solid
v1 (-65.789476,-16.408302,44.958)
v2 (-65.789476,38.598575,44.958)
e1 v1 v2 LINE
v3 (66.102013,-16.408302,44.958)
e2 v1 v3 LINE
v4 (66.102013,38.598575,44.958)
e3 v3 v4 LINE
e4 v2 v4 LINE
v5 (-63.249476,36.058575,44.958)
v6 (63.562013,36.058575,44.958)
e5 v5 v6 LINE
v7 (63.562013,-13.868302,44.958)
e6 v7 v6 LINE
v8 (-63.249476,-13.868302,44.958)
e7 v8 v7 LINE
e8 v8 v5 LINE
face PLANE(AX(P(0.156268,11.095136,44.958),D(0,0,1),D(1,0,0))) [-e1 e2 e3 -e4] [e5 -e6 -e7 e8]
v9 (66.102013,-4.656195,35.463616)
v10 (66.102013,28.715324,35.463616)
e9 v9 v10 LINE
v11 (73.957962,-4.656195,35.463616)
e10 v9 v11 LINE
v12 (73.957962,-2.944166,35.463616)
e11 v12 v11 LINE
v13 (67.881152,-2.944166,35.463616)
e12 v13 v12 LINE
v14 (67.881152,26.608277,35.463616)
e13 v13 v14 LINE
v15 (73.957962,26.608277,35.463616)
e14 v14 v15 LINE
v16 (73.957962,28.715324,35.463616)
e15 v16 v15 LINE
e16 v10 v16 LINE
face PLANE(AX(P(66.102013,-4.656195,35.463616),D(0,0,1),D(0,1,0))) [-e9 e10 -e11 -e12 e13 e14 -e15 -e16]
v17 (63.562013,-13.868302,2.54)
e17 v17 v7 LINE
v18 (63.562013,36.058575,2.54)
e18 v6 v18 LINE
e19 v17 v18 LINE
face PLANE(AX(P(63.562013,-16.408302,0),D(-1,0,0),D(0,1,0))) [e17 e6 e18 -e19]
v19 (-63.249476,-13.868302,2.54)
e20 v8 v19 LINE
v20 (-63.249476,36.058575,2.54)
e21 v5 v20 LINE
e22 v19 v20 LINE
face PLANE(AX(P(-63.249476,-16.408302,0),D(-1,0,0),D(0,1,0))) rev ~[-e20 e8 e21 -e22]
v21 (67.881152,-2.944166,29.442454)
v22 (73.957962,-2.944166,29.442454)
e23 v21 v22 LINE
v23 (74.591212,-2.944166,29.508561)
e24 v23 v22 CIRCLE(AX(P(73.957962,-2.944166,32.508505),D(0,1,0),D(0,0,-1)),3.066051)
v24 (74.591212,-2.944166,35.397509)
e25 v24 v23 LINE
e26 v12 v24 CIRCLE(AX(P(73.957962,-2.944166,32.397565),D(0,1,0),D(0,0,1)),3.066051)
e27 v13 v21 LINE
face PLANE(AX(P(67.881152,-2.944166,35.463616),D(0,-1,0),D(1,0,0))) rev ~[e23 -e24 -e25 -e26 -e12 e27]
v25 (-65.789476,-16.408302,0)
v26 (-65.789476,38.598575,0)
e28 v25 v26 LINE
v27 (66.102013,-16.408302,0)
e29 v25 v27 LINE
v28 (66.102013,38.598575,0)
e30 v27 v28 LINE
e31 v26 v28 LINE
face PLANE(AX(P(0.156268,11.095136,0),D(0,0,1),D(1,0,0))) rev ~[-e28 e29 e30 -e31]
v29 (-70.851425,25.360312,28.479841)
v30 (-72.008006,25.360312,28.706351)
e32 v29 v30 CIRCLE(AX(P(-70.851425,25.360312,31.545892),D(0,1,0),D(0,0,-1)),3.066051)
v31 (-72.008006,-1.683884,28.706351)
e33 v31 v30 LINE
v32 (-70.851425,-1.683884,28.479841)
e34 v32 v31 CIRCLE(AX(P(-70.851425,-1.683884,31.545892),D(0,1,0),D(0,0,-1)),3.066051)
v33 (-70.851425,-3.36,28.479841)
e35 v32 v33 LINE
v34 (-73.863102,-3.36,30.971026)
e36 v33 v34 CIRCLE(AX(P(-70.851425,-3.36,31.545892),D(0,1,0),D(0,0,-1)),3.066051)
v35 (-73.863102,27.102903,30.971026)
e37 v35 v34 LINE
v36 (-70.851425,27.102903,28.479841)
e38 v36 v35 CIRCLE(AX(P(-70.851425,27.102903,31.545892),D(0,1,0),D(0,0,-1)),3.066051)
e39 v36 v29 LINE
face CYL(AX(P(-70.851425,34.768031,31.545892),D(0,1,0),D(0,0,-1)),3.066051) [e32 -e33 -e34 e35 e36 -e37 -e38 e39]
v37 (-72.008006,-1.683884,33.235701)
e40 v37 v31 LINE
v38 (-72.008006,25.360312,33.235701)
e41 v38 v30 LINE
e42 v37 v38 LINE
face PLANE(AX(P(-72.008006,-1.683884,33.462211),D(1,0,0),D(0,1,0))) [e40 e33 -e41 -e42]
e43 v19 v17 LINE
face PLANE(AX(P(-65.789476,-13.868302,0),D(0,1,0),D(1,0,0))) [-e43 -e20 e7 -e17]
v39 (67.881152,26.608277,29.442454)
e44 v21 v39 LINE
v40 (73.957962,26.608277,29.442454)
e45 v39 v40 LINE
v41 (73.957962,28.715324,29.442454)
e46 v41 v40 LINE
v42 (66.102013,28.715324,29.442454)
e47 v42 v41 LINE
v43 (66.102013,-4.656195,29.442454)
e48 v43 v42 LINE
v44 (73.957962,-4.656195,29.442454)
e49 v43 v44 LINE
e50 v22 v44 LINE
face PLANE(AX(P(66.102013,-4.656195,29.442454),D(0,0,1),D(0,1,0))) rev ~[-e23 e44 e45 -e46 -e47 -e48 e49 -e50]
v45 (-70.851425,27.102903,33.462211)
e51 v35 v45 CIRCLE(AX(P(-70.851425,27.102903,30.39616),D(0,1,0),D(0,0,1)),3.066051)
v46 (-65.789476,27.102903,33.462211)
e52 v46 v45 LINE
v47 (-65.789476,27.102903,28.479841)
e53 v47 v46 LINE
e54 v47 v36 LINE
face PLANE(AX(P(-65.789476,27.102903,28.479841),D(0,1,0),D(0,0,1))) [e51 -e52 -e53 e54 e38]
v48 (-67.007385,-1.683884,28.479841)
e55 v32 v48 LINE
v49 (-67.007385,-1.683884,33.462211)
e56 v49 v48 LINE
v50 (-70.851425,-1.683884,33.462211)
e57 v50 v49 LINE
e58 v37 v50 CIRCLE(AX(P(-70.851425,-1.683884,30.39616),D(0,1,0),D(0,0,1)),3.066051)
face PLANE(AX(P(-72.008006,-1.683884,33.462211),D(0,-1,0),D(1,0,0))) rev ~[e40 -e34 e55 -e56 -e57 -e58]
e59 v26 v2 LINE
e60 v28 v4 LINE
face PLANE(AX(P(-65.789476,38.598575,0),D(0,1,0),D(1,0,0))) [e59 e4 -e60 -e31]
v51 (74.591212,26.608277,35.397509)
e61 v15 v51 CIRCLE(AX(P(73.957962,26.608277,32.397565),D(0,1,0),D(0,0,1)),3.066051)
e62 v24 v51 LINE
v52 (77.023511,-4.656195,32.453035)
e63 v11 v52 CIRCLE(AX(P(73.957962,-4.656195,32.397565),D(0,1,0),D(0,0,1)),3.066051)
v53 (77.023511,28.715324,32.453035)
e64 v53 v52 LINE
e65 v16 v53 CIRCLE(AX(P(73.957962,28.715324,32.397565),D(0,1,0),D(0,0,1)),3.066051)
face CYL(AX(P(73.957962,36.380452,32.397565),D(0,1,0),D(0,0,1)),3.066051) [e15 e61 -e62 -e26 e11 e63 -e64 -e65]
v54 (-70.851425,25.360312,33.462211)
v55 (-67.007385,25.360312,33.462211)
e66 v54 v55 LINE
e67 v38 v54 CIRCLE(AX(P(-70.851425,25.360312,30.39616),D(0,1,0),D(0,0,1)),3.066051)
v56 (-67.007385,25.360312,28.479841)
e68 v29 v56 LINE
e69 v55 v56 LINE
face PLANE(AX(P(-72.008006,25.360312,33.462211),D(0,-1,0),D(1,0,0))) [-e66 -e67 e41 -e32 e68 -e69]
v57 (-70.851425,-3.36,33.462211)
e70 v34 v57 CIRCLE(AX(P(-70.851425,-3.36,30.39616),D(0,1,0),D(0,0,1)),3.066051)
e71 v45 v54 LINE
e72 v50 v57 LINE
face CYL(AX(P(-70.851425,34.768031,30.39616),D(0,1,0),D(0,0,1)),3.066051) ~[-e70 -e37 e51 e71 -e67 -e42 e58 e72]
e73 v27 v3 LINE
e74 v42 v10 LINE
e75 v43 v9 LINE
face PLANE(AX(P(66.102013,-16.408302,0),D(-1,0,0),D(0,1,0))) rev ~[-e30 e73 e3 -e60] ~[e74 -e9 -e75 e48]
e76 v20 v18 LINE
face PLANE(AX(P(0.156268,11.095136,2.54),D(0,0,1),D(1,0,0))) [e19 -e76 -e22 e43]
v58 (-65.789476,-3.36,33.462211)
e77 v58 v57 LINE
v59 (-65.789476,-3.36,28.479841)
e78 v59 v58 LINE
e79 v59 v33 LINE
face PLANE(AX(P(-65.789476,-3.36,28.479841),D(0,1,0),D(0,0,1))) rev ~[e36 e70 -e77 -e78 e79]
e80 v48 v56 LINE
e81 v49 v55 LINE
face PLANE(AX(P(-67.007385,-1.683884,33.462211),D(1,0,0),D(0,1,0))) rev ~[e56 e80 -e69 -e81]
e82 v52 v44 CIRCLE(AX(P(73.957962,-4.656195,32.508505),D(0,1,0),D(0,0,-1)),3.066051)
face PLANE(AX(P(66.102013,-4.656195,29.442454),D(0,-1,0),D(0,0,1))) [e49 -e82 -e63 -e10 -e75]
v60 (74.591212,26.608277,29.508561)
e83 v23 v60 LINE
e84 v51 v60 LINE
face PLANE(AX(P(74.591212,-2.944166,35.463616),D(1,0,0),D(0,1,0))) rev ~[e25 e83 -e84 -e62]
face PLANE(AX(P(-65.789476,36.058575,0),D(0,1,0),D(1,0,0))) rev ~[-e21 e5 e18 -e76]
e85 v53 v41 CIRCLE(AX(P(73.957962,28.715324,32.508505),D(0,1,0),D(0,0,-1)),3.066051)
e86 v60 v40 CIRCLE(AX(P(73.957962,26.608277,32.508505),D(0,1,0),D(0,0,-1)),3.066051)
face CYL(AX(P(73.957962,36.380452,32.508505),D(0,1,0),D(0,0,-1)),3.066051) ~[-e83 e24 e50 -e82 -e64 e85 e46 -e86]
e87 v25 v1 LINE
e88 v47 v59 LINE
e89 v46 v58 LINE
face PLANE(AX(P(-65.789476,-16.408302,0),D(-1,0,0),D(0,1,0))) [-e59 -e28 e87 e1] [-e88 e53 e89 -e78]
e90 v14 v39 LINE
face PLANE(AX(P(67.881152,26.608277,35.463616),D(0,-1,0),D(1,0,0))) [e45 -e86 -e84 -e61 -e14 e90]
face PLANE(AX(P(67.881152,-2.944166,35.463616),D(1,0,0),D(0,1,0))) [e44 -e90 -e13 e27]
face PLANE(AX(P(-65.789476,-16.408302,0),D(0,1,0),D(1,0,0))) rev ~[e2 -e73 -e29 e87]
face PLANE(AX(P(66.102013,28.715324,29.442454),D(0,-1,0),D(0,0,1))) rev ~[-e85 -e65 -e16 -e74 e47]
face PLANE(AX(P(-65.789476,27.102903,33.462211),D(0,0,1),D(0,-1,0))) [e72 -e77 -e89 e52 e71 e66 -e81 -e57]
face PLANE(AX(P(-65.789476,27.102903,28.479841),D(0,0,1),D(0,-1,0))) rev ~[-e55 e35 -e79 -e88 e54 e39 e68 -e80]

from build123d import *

# Parameters (mm, degrees)
F0_W         = 131.8914890289
F0_H         = 55.0068765879
F1_DEPTH     = 44.958
F2_T         = -2.54
F3_W         = 33.3715188317
F3_H         = 6.021162495
F4_DEPTH     = 10.922
F5_W         = 6.7100599408
F5_H         = 29.552442953
F6_DEPTH     = 25.4
F7_T1_DEPTH  = 48.7017749528
F8_W         = 30.4629029706
F8_H         = 4.9823708832
F9_DEPTH     = 8.128
F10_W        = 5.0006210804
F10_H        = 27.0441961475
F11_DEPTH    = 25.4
F12_T1_DEPTH = 45.7931590917


# Not quite as in the source:
# - a fillet or chamfer that OpenCascade refuses, or shapes differently, is made with other operations: its cross-section is extruded or revolved along the edge and cut away or added


with BuildPart() as f1:
    # F0 (on Top) → F1 (new body)
    with BuildSketch(Plane.XY):
        with Locations((0.1562684774, 11.095136404)):
            Rectangle(F0_W, F0_H)
    extrude(amount=F1_DEPTH)

    # F2
    f2_openings = [f1.faces().sort_by_distance(p)[0] for p in [
        (0.156268, 11.095136, 44.958),
    ]]
    offset(amount=F2_T, openings=f2_openings)

    # F3 (on face) → F4 (join)
    with BuildSketch(Plane.YZ.offset(66.1020129919)):
        with Locations((12.0295642409, 32.4530350044)):
            Rectangle(F3_W, F3_H)
    extrude(amount=F4_DEPTH)

    # F5 (on face) → F6 (cut)
    with BuildSketch(Plane.XY.offset(35.4636162519)):
        with Locations((71.2361820042, 11.8320556358)):
            Rectangle(F5_W, F5_H)
    extrude(amount=-F6_DEPTH, mode=Mode.SUBTRACT)

    # F7: fillet of radius 3.0660512242 on 2 edges, made by hand

    # F7_s2 → F7_t1 (cut)
    with BuildSketch(Plane.XZ.offset(-36.3804517173)):
        with BuildLine():
            ThreePointArc((73.9579617677, 35.4636162519), (76.1259873798, 34.5655906398), (77.0240129919, 32.3975650277))
            Line((77.0240129919, 32.3975650277), (77.0240129919, 35.4636162519))
            Line((77.0240129919, 35.4636162519), (73.9579617677, 35.4636162519))
        make_face()
        with BuildLine():
            ThreePointArc((73.9579617677, 29.4424537569), (76.1259873798, 30.340479369), (77.0240129919, 32.5085049811))
            Line((77.0240129919, 32.5085049811), (77.0240129919, 29.4424537569))
            Line((77.0240129919, 29.4424537569), (73.9579617677, 29.4424537569))
        make_face()
    extrude(amount=F7_T1_DEPTH, mode=Mode.SUBTRACT)

    # F8 (on face) → F9 (join)
    with BuildSketch(Plane(origin=(-65.789476037, 0, 0), x_dir=(0, -1, 0), z_dir=(-1, 0, 0))):
        with Locations((-11.8714510463, 30.9710260481)):
            Rectangle(F8_W, F8_H)
    extrude(amount=F9_DEPTH)

    # F10 (on face) → F11 (cut)
    with BuildSketch(Plane.XY.offset(33.4622114897)):
        with Locations((-69.5076957345, 11.8382142391)):
            Rectangle(F10_W, F10_H)
    extrude(amount=-F11_DEPTH, mode=Mode.SUBTRACT)

    # F12: fillet of radius 3.0660512242 on 2 edges, made by hand

    # F12_s2 → F12_t1 (cut)
    with BuildSketch(Plane.XZ.offset(-34.7680305922)):
        with BuildLine():
            ThreePointArc((-70.8514248128, 33.4622114897), (-73.0194504249, 32.5641858776), (-73.917476037, 30.3961602655))
            Line((-73.917476037, 30.3961602655), (-73.917476037, 33.4622114897))
            Line((-73.917476037, 33.4622114897), (-70.8514248128, 33.4622114897))
        make_face()
        with BuildLine():
            ThreePointArc((-70.8514248128, 28.4798406065), (-73.0194504249, 29.3778662186), (-73.917476037, 31.5458918307))
            Line((-73.917476037, 31.5458918307), (-73.917476037, 28.4798406065))
            Line((-73.917476037, 28.4798406065), (-70.8514248128, 28.4798406065))
        make_face()
    extrude(amount=F12_T1_DEPTH, mode=Mode.SUBTRACT)


solid = f1.part
